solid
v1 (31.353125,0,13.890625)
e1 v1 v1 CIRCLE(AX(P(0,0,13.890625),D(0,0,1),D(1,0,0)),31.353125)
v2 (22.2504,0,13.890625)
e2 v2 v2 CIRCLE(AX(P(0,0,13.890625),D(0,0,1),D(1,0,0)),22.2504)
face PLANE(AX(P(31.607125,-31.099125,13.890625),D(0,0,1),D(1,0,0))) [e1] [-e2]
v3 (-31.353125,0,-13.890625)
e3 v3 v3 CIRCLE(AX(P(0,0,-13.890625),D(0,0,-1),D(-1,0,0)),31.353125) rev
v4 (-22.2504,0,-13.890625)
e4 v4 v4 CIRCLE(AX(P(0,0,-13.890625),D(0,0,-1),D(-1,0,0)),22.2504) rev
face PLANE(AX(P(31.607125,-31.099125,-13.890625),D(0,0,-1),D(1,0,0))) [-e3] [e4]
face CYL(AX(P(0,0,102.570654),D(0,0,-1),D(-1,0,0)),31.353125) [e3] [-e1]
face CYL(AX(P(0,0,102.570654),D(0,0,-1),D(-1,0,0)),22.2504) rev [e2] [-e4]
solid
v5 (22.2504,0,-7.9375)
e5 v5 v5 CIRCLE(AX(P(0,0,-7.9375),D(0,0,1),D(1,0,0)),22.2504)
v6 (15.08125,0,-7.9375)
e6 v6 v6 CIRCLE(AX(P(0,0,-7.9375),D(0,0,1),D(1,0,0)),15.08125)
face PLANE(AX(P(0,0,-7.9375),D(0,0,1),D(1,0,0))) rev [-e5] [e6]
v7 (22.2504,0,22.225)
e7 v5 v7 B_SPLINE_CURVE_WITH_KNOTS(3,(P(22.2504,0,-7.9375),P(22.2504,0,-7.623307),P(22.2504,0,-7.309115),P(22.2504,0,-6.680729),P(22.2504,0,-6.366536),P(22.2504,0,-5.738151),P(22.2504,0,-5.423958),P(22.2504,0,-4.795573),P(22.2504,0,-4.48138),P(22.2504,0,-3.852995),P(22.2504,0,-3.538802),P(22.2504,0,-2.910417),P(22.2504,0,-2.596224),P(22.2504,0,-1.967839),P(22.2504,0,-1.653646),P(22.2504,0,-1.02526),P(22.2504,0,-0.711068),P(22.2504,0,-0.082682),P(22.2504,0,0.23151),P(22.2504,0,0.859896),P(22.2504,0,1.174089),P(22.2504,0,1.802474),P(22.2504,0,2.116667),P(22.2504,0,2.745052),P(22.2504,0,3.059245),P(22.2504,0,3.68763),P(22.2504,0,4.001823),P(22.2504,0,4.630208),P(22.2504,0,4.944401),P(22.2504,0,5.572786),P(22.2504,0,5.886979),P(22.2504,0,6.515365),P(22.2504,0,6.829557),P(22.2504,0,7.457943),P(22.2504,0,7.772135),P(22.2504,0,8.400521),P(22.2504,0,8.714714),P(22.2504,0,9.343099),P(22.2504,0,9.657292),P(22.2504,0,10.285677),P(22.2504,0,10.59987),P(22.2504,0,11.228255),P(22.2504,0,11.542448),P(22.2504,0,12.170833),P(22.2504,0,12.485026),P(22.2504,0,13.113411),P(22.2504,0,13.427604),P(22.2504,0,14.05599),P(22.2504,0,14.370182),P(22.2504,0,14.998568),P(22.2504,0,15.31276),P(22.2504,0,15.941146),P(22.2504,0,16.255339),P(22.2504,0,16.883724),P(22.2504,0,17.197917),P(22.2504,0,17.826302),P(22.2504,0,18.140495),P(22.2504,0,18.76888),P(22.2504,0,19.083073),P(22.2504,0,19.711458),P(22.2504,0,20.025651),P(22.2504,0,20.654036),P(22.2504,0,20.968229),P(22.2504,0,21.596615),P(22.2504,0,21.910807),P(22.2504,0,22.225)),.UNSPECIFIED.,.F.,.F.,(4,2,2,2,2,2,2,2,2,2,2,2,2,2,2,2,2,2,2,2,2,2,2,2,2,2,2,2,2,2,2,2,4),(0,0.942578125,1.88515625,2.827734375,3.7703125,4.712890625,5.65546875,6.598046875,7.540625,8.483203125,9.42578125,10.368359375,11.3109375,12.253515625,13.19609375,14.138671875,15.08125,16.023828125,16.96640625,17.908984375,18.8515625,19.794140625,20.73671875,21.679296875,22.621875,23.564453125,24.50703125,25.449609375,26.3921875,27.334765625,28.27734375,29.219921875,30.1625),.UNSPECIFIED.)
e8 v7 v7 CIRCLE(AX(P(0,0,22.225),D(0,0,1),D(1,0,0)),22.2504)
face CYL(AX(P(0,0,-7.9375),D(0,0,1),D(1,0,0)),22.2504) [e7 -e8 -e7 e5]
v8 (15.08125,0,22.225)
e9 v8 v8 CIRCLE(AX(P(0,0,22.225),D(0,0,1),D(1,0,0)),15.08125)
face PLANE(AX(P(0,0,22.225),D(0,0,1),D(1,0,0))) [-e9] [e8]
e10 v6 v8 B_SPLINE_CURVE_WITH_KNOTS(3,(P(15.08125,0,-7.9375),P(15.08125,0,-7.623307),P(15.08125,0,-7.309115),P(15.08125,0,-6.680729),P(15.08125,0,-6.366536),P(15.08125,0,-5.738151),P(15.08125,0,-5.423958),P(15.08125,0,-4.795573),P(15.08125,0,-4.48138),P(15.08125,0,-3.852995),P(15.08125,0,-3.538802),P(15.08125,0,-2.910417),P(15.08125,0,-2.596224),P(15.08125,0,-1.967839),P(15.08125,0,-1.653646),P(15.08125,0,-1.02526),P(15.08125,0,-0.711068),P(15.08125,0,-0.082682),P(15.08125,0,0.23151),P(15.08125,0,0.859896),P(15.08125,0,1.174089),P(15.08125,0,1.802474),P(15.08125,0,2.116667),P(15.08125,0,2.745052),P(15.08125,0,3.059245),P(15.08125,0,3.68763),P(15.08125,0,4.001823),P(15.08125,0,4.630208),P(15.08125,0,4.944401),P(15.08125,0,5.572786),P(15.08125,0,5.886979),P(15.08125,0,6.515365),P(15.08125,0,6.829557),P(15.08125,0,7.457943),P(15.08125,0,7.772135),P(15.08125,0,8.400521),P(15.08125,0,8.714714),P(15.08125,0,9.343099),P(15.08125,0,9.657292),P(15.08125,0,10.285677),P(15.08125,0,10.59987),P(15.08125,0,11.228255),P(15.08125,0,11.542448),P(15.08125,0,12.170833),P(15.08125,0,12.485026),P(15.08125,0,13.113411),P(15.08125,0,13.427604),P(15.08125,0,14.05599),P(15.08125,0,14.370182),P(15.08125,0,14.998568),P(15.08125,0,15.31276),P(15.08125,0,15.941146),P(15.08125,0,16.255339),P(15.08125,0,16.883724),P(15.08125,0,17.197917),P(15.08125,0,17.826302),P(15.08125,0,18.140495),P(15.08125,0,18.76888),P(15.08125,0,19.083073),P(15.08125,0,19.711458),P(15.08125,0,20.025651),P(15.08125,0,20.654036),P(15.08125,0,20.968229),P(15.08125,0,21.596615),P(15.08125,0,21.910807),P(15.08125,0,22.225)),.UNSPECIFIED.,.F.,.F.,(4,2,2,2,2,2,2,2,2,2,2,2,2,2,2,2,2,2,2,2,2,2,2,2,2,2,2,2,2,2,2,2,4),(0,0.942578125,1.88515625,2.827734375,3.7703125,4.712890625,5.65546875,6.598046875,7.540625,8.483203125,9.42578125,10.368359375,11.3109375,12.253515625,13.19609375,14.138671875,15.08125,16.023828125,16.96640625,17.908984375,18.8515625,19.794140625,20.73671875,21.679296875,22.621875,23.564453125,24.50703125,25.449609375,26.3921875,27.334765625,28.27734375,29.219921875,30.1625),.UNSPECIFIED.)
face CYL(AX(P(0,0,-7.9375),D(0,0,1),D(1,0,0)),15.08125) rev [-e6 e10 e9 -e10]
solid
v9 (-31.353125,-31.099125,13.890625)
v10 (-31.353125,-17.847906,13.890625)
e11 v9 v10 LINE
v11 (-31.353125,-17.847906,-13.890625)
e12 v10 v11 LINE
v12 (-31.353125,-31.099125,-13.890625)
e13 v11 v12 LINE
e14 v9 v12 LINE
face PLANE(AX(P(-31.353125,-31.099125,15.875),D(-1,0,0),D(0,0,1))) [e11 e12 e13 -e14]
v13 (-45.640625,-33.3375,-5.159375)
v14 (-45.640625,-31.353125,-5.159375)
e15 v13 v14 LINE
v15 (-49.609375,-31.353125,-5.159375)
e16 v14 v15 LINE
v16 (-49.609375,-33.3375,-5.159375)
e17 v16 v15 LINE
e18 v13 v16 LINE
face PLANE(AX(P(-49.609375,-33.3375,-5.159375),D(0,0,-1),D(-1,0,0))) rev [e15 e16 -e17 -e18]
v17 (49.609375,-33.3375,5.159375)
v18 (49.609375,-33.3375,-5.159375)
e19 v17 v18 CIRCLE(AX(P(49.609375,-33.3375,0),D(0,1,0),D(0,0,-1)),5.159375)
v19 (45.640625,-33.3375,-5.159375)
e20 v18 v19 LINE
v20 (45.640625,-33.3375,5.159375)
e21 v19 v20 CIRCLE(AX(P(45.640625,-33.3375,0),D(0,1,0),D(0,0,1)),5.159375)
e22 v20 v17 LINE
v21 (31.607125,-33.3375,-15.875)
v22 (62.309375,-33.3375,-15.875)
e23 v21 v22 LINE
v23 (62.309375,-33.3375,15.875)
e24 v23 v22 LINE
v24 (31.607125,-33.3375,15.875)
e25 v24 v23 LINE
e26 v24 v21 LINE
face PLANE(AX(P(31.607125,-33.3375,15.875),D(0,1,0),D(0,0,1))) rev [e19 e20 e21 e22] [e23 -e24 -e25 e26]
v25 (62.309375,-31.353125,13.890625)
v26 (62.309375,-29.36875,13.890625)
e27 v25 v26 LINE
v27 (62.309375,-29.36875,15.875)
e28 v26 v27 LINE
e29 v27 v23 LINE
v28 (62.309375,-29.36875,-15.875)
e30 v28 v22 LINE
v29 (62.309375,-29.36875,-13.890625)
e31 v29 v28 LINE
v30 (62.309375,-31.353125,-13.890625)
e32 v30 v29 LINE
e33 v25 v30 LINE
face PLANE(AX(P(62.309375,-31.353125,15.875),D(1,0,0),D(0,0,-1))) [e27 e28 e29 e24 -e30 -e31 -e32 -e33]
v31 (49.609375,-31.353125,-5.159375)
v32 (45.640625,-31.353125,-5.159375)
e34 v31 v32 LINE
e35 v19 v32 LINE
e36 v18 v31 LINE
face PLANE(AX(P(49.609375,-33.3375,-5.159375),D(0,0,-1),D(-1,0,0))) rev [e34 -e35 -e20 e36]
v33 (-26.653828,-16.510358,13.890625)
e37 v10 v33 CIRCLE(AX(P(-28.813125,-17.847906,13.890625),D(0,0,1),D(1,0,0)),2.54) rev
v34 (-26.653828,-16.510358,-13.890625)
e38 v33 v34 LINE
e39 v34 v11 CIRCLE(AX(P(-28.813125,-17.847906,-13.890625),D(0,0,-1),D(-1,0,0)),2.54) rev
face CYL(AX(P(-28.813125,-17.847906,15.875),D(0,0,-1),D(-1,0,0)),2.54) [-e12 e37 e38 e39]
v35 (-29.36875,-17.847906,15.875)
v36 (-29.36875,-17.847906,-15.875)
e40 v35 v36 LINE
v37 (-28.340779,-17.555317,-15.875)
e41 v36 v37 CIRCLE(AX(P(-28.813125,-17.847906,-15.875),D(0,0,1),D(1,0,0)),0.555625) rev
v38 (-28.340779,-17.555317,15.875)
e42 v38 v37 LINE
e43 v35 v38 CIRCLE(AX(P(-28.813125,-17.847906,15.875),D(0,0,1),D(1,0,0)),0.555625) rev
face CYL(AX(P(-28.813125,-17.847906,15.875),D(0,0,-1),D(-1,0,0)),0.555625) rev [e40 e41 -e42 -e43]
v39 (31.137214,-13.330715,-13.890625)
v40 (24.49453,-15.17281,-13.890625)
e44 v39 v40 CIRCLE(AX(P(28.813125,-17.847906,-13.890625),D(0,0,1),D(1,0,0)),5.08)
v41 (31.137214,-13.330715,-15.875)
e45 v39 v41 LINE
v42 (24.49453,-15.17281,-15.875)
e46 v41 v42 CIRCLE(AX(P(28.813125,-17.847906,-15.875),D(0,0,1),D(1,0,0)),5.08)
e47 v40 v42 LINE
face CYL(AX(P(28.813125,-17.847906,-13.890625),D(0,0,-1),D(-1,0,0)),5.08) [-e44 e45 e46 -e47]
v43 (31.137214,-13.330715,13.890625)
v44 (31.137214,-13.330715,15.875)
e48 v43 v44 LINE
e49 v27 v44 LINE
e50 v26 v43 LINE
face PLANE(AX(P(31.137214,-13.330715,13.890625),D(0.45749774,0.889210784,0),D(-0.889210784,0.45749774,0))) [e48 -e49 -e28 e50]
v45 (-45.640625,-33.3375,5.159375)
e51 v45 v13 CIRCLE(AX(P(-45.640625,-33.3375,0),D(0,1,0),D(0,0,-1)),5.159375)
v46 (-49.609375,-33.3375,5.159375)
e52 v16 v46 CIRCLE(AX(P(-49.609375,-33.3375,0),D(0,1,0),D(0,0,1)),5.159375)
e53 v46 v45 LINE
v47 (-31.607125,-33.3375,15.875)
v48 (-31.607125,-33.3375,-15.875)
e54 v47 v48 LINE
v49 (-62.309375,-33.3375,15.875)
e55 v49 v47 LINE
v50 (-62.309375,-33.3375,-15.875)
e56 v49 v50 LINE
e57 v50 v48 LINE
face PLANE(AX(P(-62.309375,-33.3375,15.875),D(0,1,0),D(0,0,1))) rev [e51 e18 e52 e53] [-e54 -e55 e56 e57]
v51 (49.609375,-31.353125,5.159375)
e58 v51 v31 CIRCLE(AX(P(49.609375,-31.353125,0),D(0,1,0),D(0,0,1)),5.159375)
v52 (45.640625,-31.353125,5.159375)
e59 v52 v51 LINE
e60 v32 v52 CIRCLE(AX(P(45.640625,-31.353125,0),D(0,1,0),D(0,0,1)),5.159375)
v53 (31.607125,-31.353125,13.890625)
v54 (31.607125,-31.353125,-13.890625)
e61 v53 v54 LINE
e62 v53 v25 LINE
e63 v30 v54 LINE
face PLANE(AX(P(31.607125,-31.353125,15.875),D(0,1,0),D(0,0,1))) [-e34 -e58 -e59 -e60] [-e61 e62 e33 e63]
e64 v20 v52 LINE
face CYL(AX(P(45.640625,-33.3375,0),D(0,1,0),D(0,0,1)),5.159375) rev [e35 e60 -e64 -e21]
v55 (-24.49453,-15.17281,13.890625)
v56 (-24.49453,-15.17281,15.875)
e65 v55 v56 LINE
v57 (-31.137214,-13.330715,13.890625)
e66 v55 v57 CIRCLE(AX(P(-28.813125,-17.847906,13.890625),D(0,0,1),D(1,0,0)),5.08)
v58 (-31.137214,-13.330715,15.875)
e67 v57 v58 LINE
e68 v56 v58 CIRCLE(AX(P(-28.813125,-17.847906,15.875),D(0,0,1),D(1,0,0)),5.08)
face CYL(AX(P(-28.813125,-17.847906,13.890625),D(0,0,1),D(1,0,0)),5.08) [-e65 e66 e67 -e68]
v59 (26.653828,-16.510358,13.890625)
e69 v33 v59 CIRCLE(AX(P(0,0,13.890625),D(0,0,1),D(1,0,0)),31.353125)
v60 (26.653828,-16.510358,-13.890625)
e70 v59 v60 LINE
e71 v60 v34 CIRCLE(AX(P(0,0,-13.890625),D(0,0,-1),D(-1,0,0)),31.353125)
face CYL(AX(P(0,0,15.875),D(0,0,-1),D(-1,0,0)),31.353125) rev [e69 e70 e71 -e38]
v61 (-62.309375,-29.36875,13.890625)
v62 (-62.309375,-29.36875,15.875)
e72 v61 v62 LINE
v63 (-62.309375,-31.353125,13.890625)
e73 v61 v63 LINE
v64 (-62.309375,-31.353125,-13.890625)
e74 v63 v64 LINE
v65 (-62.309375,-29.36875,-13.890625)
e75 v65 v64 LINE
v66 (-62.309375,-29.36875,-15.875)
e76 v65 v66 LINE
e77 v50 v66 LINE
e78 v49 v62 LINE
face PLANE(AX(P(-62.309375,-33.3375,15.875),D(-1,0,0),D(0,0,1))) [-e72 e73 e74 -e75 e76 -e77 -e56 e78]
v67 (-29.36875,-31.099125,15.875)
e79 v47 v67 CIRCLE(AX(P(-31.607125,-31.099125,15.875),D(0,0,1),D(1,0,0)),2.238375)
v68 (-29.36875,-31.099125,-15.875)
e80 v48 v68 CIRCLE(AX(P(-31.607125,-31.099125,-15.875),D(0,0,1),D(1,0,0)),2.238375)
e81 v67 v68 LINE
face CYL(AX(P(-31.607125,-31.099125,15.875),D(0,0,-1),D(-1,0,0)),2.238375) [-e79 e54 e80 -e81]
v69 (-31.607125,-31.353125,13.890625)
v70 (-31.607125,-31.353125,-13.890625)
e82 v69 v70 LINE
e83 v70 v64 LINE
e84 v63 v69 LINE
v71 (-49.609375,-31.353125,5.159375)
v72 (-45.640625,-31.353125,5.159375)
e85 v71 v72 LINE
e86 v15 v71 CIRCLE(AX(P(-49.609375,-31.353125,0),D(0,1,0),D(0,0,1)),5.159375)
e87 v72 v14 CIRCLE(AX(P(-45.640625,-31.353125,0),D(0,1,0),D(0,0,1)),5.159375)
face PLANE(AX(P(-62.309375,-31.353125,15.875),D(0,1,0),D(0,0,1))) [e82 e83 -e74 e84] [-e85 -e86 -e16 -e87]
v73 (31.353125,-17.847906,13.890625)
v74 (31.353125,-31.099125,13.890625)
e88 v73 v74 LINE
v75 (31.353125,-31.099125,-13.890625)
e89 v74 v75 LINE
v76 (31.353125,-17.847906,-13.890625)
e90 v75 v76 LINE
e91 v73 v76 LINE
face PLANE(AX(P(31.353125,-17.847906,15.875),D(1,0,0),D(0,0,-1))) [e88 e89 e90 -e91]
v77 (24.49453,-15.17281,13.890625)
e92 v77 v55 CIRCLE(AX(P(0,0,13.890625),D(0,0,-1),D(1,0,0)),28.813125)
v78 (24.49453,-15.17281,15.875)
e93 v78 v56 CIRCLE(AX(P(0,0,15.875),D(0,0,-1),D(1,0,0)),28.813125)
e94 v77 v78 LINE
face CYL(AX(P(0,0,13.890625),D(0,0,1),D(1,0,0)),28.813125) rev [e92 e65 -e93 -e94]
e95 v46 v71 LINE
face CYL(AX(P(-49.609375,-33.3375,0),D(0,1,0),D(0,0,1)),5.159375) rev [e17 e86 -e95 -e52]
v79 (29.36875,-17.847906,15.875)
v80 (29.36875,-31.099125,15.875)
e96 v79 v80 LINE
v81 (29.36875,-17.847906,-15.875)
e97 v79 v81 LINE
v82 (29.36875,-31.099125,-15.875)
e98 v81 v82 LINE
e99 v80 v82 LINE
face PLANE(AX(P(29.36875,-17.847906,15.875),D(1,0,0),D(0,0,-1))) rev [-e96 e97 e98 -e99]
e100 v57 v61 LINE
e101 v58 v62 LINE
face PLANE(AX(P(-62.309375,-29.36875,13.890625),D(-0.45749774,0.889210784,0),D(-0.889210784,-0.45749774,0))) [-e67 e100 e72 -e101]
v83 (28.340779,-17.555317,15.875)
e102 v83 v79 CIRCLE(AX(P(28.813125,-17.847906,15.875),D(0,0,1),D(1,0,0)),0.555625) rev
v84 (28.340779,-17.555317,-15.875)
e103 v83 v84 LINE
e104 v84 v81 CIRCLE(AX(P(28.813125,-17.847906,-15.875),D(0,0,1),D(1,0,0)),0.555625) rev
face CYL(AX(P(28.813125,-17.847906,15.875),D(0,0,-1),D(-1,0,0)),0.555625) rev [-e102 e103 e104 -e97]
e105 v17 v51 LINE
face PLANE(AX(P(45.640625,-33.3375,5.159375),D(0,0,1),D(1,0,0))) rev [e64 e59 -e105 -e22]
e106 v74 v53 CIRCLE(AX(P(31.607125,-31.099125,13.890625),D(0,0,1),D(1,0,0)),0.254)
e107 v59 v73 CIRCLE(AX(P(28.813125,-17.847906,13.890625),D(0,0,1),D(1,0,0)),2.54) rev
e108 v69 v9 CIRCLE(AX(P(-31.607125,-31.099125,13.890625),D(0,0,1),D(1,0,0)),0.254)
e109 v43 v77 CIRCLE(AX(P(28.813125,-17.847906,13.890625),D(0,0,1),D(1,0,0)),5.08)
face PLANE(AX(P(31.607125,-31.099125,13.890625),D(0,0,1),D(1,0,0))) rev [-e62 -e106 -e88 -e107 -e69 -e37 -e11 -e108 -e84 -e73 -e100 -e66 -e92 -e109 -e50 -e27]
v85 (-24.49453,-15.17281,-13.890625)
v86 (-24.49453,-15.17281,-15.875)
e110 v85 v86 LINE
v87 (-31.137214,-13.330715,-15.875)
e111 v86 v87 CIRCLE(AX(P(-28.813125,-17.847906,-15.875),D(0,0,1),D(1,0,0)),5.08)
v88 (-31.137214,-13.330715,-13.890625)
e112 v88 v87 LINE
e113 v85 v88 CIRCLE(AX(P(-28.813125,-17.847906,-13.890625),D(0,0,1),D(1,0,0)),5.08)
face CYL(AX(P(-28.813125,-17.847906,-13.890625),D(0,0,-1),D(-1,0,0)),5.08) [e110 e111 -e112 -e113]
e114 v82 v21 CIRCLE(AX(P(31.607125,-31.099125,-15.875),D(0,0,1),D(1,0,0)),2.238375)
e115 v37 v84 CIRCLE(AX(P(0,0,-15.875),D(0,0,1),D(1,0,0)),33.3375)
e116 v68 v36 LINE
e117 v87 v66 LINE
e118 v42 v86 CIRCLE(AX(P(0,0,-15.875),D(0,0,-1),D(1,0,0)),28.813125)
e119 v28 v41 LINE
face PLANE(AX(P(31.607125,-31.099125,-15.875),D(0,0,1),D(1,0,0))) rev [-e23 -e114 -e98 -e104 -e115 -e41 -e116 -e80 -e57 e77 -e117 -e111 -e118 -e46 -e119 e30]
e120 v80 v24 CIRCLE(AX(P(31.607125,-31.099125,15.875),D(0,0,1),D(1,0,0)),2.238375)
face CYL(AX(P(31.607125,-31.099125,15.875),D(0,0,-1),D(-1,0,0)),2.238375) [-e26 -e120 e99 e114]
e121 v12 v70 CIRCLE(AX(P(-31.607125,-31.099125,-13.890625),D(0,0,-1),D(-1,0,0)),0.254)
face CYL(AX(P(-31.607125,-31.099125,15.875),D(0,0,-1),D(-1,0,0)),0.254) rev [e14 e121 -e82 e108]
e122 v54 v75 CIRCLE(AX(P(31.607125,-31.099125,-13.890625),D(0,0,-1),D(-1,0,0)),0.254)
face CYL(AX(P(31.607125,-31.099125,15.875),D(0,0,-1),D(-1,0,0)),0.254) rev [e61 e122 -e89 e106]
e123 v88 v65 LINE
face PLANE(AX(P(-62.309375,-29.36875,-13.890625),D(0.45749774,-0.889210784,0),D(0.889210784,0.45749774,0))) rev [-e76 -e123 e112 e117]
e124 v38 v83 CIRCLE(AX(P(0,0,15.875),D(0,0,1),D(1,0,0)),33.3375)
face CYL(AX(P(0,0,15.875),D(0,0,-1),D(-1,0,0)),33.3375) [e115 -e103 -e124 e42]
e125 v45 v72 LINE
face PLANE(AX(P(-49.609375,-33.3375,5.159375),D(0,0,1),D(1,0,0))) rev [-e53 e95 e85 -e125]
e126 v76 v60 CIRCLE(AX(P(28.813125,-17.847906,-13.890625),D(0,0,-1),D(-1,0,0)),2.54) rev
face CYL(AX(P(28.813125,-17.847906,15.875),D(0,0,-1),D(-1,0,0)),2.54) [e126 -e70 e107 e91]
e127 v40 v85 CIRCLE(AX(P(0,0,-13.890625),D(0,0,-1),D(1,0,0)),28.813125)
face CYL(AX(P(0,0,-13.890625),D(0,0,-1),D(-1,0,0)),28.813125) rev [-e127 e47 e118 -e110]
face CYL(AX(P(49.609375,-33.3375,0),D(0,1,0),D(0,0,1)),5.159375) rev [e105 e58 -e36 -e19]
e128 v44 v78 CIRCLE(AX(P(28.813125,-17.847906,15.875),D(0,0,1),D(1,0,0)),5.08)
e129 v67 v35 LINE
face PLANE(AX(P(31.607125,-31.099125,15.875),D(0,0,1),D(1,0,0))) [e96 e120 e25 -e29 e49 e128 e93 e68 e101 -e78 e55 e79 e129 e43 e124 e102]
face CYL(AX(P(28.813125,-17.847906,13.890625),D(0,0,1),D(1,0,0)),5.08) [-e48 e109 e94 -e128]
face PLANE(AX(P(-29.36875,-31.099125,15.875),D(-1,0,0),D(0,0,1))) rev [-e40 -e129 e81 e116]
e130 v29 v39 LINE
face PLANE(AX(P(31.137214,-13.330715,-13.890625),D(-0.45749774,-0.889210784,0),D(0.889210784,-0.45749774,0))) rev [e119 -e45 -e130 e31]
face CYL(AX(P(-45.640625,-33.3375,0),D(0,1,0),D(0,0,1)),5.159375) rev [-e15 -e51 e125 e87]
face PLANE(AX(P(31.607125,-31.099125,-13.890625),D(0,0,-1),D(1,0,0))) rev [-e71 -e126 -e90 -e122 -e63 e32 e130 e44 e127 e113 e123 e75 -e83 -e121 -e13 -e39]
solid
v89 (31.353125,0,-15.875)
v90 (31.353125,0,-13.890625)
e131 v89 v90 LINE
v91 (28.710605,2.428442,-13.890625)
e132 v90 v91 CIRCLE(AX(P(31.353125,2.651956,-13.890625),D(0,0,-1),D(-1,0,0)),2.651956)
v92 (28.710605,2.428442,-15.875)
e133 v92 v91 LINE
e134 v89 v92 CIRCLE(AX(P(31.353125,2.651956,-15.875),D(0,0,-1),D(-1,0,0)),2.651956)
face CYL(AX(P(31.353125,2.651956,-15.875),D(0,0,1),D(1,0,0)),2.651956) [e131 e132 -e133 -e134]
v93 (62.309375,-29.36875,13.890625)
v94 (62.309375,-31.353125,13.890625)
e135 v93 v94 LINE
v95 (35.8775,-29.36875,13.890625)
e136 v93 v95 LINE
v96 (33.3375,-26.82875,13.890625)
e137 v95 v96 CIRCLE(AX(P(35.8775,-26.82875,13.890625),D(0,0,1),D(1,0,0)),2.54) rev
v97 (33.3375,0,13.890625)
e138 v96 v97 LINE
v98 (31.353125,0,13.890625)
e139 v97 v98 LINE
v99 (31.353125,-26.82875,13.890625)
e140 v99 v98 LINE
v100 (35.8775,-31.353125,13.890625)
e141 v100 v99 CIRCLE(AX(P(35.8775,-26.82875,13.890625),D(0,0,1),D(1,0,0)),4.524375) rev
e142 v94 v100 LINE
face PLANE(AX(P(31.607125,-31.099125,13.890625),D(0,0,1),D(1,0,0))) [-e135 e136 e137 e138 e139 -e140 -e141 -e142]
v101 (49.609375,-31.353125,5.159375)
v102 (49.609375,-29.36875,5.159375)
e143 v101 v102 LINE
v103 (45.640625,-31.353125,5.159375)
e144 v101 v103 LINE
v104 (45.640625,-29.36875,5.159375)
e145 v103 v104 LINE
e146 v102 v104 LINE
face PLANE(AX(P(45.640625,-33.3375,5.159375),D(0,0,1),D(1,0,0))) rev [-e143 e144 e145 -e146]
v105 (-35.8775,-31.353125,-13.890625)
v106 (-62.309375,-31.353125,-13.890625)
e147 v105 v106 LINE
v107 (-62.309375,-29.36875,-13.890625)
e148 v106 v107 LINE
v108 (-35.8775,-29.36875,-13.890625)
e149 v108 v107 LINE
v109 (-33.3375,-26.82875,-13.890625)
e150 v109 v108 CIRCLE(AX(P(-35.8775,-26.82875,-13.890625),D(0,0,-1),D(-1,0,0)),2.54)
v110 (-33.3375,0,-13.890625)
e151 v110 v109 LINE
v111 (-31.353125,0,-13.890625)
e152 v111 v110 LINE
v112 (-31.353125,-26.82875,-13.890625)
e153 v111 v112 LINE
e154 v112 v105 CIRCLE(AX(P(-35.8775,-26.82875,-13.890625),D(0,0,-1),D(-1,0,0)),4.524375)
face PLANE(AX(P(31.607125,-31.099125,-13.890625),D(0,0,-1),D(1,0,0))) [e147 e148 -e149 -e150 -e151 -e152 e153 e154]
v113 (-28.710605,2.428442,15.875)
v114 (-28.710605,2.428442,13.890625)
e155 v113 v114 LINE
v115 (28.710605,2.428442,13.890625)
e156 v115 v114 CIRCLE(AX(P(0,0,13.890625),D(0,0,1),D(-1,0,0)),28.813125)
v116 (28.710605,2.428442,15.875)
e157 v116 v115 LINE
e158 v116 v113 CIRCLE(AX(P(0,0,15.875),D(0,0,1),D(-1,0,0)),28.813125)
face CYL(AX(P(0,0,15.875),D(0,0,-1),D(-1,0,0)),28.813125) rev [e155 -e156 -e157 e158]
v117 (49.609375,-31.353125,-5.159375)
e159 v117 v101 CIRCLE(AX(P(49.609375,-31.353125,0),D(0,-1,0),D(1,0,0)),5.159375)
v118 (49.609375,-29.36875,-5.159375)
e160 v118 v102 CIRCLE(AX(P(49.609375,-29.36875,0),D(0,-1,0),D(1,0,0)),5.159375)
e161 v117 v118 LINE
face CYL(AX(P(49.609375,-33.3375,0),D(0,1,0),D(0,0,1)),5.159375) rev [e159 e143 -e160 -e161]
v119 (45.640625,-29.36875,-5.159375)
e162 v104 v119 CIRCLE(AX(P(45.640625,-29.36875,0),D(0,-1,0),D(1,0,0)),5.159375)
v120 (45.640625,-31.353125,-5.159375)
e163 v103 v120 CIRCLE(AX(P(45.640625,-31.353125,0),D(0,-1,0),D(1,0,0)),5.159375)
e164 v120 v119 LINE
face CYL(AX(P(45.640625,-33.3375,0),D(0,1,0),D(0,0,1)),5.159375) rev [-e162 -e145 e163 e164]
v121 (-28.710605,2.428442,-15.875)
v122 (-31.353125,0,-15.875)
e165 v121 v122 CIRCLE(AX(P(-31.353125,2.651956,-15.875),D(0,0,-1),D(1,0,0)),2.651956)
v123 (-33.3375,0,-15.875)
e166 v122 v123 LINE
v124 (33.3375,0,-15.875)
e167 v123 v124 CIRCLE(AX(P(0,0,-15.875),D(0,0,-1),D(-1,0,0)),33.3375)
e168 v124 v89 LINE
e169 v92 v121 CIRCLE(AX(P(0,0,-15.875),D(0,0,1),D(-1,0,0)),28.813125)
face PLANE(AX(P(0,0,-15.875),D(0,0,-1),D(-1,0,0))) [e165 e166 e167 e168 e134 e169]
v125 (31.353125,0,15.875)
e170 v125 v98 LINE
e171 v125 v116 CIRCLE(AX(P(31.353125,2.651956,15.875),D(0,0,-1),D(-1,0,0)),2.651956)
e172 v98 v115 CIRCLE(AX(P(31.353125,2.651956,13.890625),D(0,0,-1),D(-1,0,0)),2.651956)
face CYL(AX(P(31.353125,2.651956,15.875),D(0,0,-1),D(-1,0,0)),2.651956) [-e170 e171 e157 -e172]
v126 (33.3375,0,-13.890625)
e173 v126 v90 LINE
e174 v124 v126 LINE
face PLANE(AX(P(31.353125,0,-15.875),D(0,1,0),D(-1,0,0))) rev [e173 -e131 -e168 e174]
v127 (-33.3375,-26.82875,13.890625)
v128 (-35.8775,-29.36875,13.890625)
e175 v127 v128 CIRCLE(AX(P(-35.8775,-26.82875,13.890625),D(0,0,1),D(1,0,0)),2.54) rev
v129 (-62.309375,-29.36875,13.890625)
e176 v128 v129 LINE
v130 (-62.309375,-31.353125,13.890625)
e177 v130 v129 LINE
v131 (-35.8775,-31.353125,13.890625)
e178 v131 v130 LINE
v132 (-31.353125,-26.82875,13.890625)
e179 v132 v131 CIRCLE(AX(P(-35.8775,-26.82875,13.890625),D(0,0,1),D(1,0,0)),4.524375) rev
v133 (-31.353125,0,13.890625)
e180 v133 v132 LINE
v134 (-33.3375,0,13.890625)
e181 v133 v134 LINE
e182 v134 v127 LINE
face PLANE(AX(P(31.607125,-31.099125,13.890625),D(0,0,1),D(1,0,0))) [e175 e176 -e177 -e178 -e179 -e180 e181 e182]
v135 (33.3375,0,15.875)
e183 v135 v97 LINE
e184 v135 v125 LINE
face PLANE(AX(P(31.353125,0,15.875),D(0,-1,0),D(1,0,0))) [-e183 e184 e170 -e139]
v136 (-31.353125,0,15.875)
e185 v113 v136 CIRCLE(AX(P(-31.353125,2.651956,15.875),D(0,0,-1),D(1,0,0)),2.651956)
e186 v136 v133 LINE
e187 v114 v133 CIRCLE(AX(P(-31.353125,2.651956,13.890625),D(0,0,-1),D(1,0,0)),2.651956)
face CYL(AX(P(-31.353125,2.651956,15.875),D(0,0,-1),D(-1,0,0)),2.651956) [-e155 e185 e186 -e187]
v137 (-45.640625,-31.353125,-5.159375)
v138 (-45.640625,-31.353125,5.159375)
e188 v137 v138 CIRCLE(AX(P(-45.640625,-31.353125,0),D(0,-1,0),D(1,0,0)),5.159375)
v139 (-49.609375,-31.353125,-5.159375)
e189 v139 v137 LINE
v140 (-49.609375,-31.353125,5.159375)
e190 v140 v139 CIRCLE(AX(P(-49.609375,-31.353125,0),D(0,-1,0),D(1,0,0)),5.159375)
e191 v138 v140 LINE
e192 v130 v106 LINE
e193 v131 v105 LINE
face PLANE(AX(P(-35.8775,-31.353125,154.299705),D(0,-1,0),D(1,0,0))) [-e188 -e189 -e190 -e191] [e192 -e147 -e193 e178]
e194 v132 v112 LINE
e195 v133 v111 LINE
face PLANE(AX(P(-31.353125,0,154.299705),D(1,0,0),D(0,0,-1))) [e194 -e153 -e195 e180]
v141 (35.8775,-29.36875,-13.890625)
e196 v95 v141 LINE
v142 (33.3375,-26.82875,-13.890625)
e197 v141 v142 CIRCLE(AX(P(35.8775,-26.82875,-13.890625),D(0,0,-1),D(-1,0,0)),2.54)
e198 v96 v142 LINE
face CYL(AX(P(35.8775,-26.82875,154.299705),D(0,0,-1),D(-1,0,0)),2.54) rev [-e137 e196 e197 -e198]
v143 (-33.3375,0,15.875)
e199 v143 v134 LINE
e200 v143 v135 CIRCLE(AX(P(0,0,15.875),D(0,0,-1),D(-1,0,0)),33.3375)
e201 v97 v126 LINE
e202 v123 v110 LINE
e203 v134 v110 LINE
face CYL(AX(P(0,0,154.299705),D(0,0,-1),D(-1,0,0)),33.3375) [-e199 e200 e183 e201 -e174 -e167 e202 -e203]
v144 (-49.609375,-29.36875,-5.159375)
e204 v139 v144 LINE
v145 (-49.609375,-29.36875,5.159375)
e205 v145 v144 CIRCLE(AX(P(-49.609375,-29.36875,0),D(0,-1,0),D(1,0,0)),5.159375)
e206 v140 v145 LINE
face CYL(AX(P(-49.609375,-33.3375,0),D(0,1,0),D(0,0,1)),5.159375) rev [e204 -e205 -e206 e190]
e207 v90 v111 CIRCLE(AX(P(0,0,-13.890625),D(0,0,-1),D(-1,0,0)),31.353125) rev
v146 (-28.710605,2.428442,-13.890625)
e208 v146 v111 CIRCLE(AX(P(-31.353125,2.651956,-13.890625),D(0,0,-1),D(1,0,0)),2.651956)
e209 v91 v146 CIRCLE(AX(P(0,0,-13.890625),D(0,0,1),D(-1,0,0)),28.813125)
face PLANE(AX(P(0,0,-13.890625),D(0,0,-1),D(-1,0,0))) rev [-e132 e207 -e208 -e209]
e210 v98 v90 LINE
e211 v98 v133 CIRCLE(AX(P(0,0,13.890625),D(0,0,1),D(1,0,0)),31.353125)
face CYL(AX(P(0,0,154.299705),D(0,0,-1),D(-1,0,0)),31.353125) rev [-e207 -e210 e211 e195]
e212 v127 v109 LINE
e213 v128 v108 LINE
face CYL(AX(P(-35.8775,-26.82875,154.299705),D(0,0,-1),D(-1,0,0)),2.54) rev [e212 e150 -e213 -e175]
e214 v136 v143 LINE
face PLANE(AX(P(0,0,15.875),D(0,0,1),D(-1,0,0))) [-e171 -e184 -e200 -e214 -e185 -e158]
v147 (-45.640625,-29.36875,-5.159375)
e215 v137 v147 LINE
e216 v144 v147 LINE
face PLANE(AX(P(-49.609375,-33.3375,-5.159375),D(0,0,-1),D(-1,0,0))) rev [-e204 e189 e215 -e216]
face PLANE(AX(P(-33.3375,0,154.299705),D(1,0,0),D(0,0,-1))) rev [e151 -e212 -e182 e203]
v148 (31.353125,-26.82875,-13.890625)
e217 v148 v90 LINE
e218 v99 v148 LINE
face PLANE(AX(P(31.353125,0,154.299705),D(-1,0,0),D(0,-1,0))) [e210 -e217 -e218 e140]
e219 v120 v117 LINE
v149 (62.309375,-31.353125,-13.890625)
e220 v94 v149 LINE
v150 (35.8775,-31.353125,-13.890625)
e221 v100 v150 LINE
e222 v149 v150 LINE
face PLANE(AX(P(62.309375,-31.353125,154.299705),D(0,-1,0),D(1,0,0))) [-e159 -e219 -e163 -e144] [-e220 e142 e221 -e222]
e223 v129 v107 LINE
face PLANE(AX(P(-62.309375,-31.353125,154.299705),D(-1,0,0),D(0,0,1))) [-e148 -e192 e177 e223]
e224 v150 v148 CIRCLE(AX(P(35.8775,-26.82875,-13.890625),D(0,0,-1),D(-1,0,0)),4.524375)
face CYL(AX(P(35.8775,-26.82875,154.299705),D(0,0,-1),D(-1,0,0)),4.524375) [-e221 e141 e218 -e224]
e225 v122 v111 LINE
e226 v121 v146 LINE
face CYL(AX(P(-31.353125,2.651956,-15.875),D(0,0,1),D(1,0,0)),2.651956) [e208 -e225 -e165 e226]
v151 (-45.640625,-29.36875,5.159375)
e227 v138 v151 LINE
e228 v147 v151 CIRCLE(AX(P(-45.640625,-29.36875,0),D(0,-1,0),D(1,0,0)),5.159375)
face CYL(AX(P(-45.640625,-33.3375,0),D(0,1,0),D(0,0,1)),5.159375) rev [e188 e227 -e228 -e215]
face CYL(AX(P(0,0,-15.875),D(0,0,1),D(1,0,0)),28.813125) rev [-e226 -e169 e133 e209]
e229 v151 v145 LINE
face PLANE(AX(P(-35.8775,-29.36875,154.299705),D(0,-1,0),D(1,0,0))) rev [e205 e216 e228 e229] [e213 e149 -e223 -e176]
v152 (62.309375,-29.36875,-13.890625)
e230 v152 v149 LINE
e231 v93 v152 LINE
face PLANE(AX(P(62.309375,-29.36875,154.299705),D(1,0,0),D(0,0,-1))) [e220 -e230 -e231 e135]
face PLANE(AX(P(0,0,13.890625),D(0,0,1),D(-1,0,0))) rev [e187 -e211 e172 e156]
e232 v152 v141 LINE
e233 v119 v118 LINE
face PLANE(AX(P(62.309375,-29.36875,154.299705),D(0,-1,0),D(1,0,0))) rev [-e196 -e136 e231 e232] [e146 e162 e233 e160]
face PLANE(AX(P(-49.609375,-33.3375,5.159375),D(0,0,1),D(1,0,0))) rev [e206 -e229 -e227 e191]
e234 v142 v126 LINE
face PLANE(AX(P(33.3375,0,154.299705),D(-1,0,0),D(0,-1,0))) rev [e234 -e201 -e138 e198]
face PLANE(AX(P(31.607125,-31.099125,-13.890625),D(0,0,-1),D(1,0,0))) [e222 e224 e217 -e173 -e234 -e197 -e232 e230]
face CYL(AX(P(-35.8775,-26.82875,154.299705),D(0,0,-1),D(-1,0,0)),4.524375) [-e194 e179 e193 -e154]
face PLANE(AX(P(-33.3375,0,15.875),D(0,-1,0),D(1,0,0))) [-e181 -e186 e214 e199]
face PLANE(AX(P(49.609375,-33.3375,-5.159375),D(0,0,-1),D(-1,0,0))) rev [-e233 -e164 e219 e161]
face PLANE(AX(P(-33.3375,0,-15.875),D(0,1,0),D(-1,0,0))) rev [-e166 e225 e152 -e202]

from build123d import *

# Parameters (mm, degrees)
EXTRUDE_THIN2_DEPTH  = 15.875
EXTRUDE1_DEPTH       = 1.984375
EXTRUDE_THIN3_START  = -13.890625
EXTRUDE_THIN3_DEPTH  = 27.78125
EXTRUDE2_DEPTH       = 1.984375
EXTRUDE3_START       = -13.890625
EXTRUDE3_OUTLINE_R   = 31.353125
EXTRUDE3_OUTLINE_R_2 = 22.2504
EXTRUDE3_DEPTH       = 27.78125
SKETCH8_R            = 22.2504
SKETCH8_R_2          = 15.08125
EXTRUDE4_DEPTH       = 30.1625
CUT_EXTRUDE1_DEPTH   = 75.079671598


# Read off the part's stored shape, not the designer's step: Extrude-Thin3, Extrude3
with BuildPart() as part:
    # Sketch1 → Extrude-Thin2 (new, symmetric)
    with BuildSketch(Plane.XY):
        with BuildLine():
            Line((-62.309375, -31.353125), (-31.607125, -31.353125))
            ThreePointArc((-31.607125, -31.353125), (-31.427519878, -31.278730122), (-31.353125, -31.099125))
            Line((-31.353125, -31.099125), (-31.353125, -17.84790604))
            ThreePointArc((-31.353125, -17.84790604), (-29.508461085, -15.404934953), (-26.653827576, -16.510358046))
            ThreePointArc((-26.653827576, -16.510358046), (0, -31.353125), (26.653827576, -16.510358046))
            ThreePointArc((26.653827576, -16.510358046), (29.508461085, -15.404934953), (31.353125, -17.84790604))
            Line((31.353125, -17.84790604), (31.353125, -31.099125))
            ThreePointArc((31.353125, -31.099125), (31.427519878, -31.278730122), (31.607125, -31.353125))
            Line((31.607125, -31.353125), (62.309375, -31.353125))
            Line((62.309375, -31.353125), (62.309375, -33.3375))
            Line((62.309375, -33.3375), (31.607125, -33.3375))
            ThreePointArc((31.607125, -33.3375), (30.024354859, -32.681895141), (29.36875, -31.099125))
            Line((29.36875, -31.099125), (29.36875, -17.84790604))
            ThreePointArc((29.36875, -17.84790604), (28.965229769, -17.313506115), (28.340778689, -17.555317416))
            ThreePointArc((28.340778689, -17.555317416), (0, -33.3375), (-28.340778689, -17.555317416))
            ThreePointArc((-28.340778689, -17.555317416), (-28.965229769, -17.313506115), (-29.36875, -17.84790604))
            Line((-29.36875, -17.84790604), (-29.36875, -31.099125))
            ThreePointArc((-29.36875, -31.099125), (-30.024354859, -32.681895141), (-31.607125, -33.3375))
            Line((-31.607125, -33.3375), (-62.309375, -33.3375))
            Line((-62.309375, -33.3375), (-62.309375, -31.353125))
        make_face()
    extrude(amount=EXTRUDE_THIN2_DEPTH, both=True)

    # Sketch4 → Extrude1 (add)
    with BuildSketch(Plane.XY.offset(15.875)):
        with BuildLine():
            Line((-62.309375, -29.36875), (-31.137213521, -13.330715259))
            ThreePointArc((-31.137213521, -13.330715259), (-27.455611767, -12.952647331), (-24.494530152, -15.172810052))
            ThreePointArc((-24.494530152, -15.172810052), (0, -28.813125), (24.494530152, -15.172810052))
            ThreePointArc((24.494530152, -15.172810052), (27.455611767, -12.952647331), (31.137213521, -13.330715259))
            Line((31.137213521, -13.330715259), (62.309375, -29.36875))
            Line((62.309375, -29.36875), (62.309375, -33.3375))
            Line((62.309375, -33.3375), (31.607125, -33.3375))
            ThreePointArc((31.607125, -33.3375), (30.024354859, -32.681895141), (29.36875, -31.099125))
            Line((29.36875, -31.099125), (29.36875, -17.84790604))
            ThreePointArc((29.36875, -17.84790604), (28.965229769, -17.313506115), (28.340778689, -17.555317416))
            ThreePointArc((28.340778689, -17.555317416), (0, -33.3375), (-28.340778689, -17.555317416))
            ThreePointArc((-28.340778689, -17.555317416), (-28.965229769, -17.313506115), (-29.36875, -17.84790604))
            Line((-29.36875, -17.84790604), (-29.36875, -31.099125))
            ThreePointArc((-29.36875, -31.099125), (-30.024354859, -32.681895141), (-31.607125, -33.3375))
            Line((-31.607125, -33.3375), (-62.309375, -33.3375))
            Line((-62.309375, -33.3375), (-62.309375, -29.36875))
        make_face()
    extrude1 = extrude(amount=-EXTRUDE1_DEPTH)

    # Mirror1: Extrude1 across plane
    add(extrude1.mirror(Plane.XY))


with BuildPart() as body_2:
    # Extrude-Thin3 outline → Extrude-Thin3 (new body)
    with BuildSketch(Plane.XY.offset(EXTRUDE_THIN3_START)):
        with BuildLine():
            Line((-35.8775, -29.36875), (-62.309375, -29.36875))
            Line((-62.309375, -29.36875), (-62.309375, -31.353125))
            Line((-62.309375, -31.353125), (-35.8775, -31.353125))
            ThreePointArc((-35.8775, -31.353125), (-32.678283757, -30.027966243), (-31.353125, -26.82875))
            Line((-31.353125, -26.82875), (-31.353125, 0))
            ThreePointArc((-31.353125, 0), (0, 31.353125), (31.353125, 0))
            Line((31.353125, 0), (31.353125, -26.82875))
            ThreePointArc((31.353125, -26.82875), (32.678283757, -30.027966243), (35.8775, -31.353125))
            Line((35.8775, -31.353125), (62.309375, -31.353125))
            Line((62.309375, -31.353125), (62.309375, -29.36875))
            Line((62.309375, -29.36875), (35.8775, -29.36875))
            ThreePointArc((35.8775, -29.36875), (34.081448776, -28.624801224), (33.3375, -26.82875))
            Line((33.3375, -26.82875), (33.3375, 0))
            ThreePointArc((33.3375, 0), (0, 33.3375), (-33.3375, 0))
            Line((-33.3375, 0), (-33.3375, -26.82875))
            ThreePointArc((-33.3375, -26.82875), (-34.081448776, -28.624801224), (-35.8775, -29.36875))
        make_face()
    extrude(amount=EXTRUDE_THIN3_DEPTH)

    # Sketch6 → Extrude2 (add)
    with BuildSketch(Plane(origin=(0, 0, -13.890625), x_dir=(-1, 0, 0), z_dir=(0, 0, -1))):
        with BuildLine():
            Line((-31.353125, 0), (-33.3375, 0))
            ThreePointArc((-33.3375, 0), (0, 33.3375), (33.3375, 0))
            Line((33.3375, 0), (31.353125, 0))
            ThreePointArc((31.353125, 0), (29.55867212, 0.699314359), (28.710605003, 2.428442428))
            ThreePointArc((28.710605003, 2.428442428), (0, 28.813125), (-28.710605003, 2.428442428))
            ThreePointArc((-28.710605003, 2.428442428), (-29.55867212, 0.699314359), (-31.353125, 0))
        make_face()
    extrude2 = extrude(amount=EXTRUDE2_DEPTH)

    # Mirror2: Extrude2 across plane
    add(extrude2.mirror(Plane.XY))


with BuildPart() as body_3:
    # Extrude3 outline → Extrude3 (new body)
    with BuildSketch(Plane.XY.offset(EXTRUDE3_START)):
        Circle(EXTRUDE3_OUTLINE_R)
        Circle(EXTRUDE3_OUTLINE_R_2, mode=Mode.SUBTRACT)
    extrude(amount=EXTRUDE3_DEPTH)


with BuildPart() as body_4:
    # Sketch8 → Extrude4 (new body)
    with BuildSketch(Plane.XY.offset(22.225)):
        Circle(SKETCH8_R)
        Circle(SKETCH8_R_2, mode=Mode.SUBTRACT)
    extrude(amount=-EXTRUDE4_DEPTH)


with BuildPart() as cut_extrude1_tool:
    # Sketch3 → Cut-Extrude1 (new, through all)
    with BuildSketch(Plane(origin=(0, 0, 0), x_dir=(1, 0, 0), z_dir=(0, 1, 0))):
        with BuildLine():
            Line((-49.609375, 5.159375), (-45.640625, 5.159375))
            ThreePointArc((-45.640625, 5.159375), (-40.48125, 0), (-45.640625, -5.159375))
            Line((-45.640625, -5.159375), (-49.609375, -5.159375))
            ThreePointArc((-49.609375, -5.159375), (-54.76875, 0), (-49.609375, 5.159375))
        make_face()
        with BuildLine():
            Line((45.640625, -5.159375), (49.609375, -5.159375))
            ThreePointArc((49.609375, -5.159375), (54.76875, 0), (49.609375, 5.159375))
            Line((49.609375, 5.159375), (45.640625, 5.159375))
            ThreePointArc((45.640625, 5.159375), (40.48125, 0), (45.640625, -5.159375))
        make_face()
    extrude(amount=-CUT_EXTRUDE1_DEPTH)


with BuildPart() as part_1:
    add(part.part)

    # Cut-Extrude1: cut by cut_extrude1_tool
    add(cut_extrude1_tool.part, mode=Mode.SUBTRACT)


with BuildPart() as body_2_1:
    add(body_2.part)

    # Cut-Extrude1: cut by cut_extrude1_tool
    add(cut_extrude1_tool.part, mode=Mode.SUBTRACT)


solid = Compound([body_3.part, body_4.part, part_1.part, body_2_1.part])
